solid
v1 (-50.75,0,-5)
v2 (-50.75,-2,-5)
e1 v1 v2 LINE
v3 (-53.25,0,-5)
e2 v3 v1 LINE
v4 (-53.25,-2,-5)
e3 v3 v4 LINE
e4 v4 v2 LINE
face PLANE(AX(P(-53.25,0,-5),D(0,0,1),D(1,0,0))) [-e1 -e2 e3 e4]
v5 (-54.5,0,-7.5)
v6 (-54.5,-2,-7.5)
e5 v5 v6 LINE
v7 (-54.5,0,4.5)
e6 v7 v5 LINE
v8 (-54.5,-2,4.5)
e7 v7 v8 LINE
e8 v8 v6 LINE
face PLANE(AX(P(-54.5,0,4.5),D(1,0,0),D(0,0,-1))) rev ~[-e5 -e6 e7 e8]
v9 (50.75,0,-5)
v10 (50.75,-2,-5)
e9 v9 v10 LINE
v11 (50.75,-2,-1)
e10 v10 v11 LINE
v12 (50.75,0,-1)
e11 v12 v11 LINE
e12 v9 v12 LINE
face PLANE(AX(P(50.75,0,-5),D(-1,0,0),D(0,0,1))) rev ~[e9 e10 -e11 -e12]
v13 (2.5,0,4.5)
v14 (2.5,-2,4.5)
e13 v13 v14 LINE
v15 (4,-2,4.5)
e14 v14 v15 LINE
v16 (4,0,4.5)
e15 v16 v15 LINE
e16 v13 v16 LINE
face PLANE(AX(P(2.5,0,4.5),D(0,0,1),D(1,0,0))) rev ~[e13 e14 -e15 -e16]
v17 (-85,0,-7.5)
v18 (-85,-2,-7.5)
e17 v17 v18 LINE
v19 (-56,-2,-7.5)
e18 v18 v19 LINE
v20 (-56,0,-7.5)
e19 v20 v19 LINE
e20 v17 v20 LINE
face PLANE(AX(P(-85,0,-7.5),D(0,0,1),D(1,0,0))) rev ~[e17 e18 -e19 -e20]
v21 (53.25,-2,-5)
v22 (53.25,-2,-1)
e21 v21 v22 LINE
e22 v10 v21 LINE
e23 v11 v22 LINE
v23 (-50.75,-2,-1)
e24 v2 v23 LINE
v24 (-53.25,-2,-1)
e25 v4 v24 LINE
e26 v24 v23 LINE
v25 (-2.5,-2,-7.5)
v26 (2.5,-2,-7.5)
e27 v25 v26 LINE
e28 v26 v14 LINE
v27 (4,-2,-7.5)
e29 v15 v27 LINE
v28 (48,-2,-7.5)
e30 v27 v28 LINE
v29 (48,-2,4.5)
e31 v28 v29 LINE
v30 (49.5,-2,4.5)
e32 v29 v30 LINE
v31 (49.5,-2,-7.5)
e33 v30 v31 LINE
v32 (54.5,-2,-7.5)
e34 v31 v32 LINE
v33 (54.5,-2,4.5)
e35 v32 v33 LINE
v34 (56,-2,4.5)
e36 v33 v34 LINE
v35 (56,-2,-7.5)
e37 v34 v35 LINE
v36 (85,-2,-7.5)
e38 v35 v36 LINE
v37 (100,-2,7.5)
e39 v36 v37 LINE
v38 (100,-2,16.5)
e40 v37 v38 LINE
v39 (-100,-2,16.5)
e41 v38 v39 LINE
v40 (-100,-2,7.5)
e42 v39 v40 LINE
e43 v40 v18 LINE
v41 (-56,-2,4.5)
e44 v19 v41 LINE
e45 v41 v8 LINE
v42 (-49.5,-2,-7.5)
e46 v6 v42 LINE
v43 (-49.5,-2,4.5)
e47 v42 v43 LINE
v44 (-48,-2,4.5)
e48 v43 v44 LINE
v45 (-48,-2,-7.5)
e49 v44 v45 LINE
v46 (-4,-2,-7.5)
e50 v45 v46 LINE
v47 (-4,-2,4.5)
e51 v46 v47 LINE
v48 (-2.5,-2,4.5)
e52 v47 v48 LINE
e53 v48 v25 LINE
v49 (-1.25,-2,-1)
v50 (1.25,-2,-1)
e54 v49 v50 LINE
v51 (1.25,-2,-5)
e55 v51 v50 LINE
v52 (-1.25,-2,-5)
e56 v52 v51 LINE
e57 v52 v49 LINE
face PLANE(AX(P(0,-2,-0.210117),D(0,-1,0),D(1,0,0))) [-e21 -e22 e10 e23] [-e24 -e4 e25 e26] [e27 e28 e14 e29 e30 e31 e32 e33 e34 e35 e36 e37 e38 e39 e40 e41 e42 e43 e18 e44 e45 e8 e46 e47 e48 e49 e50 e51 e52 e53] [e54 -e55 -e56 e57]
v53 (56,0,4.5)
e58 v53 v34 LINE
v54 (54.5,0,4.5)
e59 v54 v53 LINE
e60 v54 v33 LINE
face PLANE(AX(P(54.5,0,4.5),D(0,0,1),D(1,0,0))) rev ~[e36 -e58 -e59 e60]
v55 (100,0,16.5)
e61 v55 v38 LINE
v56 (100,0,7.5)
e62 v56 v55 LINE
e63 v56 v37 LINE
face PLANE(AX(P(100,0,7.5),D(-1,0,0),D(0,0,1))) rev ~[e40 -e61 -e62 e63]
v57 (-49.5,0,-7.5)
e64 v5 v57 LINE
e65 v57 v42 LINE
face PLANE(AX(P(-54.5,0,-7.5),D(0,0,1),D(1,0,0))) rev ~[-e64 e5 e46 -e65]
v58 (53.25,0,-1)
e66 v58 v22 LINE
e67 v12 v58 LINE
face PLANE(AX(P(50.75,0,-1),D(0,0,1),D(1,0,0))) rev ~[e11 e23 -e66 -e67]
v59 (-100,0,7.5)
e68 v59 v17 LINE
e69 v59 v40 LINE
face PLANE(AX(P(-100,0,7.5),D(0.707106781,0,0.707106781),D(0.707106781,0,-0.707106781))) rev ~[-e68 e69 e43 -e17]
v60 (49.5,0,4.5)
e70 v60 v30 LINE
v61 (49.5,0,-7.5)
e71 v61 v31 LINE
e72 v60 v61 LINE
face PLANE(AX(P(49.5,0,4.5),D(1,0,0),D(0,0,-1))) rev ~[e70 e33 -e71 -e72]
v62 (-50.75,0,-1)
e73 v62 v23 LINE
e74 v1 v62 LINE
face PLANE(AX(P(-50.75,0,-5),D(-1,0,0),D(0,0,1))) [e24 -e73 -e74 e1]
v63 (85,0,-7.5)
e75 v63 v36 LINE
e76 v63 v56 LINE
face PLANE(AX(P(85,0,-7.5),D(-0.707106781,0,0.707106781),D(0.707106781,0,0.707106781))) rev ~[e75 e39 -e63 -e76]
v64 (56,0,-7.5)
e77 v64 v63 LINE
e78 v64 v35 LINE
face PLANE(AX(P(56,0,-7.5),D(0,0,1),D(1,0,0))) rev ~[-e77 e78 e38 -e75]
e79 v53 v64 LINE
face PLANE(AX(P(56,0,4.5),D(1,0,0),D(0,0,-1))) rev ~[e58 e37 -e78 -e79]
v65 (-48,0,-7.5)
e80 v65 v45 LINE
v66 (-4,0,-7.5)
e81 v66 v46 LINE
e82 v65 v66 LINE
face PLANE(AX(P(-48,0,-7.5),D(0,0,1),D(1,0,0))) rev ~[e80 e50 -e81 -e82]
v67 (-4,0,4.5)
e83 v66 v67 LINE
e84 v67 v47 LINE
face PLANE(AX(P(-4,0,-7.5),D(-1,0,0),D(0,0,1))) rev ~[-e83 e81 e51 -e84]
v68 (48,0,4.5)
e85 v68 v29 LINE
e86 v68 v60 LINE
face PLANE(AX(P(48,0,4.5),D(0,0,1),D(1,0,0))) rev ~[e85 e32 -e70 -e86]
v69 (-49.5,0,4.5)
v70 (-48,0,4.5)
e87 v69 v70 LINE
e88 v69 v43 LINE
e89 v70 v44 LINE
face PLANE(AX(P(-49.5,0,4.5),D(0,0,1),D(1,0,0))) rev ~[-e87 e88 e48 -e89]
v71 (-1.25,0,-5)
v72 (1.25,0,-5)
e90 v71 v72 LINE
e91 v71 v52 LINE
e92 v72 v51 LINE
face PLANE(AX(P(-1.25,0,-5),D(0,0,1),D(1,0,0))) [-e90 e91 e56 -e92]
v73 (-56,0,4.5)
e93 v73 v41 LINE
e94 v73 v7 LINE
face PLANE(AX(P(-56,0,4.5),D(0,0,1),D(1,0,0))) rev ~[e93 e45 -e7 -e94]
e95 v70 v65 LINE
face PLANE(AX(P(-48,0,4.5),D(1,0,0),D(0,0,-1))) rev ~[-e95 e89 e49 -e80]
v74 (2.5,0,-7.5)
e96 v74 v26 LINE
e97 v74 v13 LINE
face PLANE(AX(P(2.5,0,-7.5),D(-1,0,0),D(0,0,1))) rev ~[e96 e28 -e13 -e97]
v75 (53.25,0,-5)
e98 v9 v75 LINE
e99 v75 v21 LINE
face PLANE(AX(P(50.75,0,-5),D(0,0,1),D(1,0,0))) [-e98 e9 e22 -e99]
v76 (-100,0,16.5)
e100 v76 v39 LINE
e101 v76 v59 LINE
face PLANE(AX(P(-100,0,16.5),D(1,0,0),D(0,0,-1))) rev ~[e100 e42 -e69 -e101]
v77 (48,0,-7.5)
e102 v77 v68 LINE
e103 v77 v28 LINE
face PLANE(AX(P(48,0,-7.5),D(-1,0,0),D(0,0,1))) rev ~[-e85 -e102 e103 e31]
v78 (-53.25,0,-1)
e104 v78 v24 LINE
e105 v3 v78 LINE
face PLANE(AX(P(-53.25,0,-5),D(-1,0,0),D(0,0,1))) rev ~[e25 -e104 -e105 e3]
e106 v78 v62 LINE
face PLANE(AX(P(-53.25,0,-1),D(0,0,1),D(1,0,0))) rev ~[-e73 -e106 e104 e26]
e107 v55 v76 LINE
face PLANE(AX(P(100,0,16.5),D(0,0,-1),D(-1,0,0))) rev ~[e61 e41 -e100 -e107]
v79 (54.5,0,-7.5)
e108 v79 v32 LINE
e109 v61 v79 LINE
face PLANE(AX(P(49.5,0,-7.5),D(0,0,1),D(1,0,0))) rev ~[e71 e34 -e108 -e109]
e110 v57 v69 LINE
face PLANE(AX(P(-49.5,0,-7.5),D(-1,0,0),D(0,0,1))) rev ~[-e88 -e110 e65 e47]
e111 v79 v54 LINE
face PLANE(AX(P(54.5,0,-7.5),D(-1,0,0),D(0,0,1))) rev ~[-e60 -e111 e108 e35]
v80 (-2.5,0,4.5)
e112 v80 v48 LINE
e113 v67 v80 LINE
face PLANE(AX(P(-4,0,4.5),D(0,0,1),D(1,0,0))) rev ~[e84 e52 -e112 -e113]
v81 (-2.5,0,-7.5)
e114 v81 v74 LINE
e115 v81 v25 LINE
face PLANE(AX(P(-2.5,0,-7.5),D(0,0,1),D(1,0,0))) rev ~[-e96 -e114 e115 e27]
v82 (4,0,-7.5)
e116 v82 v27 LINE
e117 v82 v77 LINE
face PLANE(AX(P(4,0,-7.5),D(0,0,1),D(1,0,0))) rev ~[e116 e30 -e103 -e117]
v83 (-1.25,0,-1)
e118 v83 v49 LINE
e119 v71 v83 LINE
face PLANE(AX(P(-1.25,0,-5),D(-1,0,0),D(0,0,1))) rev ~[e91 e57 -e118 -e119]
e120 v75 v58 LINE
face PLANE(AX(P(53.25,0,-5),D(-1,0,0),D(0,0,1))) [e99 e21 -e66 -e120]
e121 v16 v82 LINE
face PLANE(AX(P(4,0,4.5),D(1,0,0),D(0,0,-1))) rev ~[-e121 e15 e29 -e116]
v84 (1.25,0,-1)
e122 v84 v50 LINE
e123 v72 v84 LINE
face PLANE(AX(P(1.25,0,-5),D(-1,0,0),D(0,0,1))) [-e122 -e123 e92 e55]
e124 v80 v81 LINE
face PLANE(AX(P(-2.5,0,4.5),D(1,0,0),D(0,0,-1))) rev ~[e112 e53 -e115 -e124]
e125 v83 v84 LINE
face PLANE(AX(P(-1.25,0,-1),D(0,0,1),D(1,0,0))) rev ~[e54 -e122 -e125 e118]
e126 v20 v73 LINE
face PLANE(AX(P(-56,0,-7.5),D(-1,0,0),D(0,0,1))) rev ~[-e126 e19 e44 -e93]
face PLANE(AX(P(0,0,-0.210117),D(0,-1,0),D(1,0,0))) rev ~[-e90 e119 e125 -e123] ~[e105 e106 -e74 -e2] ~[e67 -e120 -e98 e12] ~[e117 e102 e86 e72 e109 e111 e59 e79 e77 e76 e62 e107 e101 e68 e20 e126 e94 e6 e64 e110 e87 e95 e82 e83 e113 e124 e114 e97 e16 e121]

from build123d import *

# Parameters (mm, degrees)
F0_W     = 2.5
F0_H     = 4
F1_DEPTH = 2


# Not quite as in the source:
# - a feature names something its author has since deleted; it is built from what else it names


with BuildPart() as f1:
    # F0 (on Front) → F1 (new body)
    with BuildSketch(Plane.XZ):
        Polygon((56, -7.5), (85, -7.5), (85, 7.5), (-85, 7.5), (-85, -7.5), (-56, -7.5), (-56, 4.5), (-54.5, 4.5), (-54.5, -7.5), (-49.5, -7.5), (-49.5, 4.5), (-48, 4.5), (-48, -7.5), (-4, -7.5), (-4, 4.5), (-2.5, 4.5), (-2.5, -7.5), (2.5, -7.5), (2.5, 4.5), (4, 4.5), (4, -7.5), (48, -7.5), (48, 4.5), (49.5, 4.5), (49.5, -7.5), (54.5, -7.5), (54.5, 4.5), (56, 4.5), align=None)
        with Locations((-52, -3)):
            Rectangle(F0_W, F0_H, mode=Mode.SUBTRACT)
        with Locations((0, -3)):
            Rectangle(F0_W, F0_H, mode=Mode.SUBTRACT)
        with Locations((52, -3)):
            Rectangle(F0_W, F0_H, mode=Mode.SUBTRACT)
        Polygon((-85, -7.5), (-85, 7.5), (-100, 7.5), align=None)
        Polygon((85, 7.5), (85, -7.5), (100, 7.5), align=None)
        Polygon((-85, 7.5), (85, 7.5), (100, 7.5), (100, 16.5), (-100, 16.5), (-100, 7.5), align=None)
    extrude(amount=F1_DEPTH)


solid = f1.part
